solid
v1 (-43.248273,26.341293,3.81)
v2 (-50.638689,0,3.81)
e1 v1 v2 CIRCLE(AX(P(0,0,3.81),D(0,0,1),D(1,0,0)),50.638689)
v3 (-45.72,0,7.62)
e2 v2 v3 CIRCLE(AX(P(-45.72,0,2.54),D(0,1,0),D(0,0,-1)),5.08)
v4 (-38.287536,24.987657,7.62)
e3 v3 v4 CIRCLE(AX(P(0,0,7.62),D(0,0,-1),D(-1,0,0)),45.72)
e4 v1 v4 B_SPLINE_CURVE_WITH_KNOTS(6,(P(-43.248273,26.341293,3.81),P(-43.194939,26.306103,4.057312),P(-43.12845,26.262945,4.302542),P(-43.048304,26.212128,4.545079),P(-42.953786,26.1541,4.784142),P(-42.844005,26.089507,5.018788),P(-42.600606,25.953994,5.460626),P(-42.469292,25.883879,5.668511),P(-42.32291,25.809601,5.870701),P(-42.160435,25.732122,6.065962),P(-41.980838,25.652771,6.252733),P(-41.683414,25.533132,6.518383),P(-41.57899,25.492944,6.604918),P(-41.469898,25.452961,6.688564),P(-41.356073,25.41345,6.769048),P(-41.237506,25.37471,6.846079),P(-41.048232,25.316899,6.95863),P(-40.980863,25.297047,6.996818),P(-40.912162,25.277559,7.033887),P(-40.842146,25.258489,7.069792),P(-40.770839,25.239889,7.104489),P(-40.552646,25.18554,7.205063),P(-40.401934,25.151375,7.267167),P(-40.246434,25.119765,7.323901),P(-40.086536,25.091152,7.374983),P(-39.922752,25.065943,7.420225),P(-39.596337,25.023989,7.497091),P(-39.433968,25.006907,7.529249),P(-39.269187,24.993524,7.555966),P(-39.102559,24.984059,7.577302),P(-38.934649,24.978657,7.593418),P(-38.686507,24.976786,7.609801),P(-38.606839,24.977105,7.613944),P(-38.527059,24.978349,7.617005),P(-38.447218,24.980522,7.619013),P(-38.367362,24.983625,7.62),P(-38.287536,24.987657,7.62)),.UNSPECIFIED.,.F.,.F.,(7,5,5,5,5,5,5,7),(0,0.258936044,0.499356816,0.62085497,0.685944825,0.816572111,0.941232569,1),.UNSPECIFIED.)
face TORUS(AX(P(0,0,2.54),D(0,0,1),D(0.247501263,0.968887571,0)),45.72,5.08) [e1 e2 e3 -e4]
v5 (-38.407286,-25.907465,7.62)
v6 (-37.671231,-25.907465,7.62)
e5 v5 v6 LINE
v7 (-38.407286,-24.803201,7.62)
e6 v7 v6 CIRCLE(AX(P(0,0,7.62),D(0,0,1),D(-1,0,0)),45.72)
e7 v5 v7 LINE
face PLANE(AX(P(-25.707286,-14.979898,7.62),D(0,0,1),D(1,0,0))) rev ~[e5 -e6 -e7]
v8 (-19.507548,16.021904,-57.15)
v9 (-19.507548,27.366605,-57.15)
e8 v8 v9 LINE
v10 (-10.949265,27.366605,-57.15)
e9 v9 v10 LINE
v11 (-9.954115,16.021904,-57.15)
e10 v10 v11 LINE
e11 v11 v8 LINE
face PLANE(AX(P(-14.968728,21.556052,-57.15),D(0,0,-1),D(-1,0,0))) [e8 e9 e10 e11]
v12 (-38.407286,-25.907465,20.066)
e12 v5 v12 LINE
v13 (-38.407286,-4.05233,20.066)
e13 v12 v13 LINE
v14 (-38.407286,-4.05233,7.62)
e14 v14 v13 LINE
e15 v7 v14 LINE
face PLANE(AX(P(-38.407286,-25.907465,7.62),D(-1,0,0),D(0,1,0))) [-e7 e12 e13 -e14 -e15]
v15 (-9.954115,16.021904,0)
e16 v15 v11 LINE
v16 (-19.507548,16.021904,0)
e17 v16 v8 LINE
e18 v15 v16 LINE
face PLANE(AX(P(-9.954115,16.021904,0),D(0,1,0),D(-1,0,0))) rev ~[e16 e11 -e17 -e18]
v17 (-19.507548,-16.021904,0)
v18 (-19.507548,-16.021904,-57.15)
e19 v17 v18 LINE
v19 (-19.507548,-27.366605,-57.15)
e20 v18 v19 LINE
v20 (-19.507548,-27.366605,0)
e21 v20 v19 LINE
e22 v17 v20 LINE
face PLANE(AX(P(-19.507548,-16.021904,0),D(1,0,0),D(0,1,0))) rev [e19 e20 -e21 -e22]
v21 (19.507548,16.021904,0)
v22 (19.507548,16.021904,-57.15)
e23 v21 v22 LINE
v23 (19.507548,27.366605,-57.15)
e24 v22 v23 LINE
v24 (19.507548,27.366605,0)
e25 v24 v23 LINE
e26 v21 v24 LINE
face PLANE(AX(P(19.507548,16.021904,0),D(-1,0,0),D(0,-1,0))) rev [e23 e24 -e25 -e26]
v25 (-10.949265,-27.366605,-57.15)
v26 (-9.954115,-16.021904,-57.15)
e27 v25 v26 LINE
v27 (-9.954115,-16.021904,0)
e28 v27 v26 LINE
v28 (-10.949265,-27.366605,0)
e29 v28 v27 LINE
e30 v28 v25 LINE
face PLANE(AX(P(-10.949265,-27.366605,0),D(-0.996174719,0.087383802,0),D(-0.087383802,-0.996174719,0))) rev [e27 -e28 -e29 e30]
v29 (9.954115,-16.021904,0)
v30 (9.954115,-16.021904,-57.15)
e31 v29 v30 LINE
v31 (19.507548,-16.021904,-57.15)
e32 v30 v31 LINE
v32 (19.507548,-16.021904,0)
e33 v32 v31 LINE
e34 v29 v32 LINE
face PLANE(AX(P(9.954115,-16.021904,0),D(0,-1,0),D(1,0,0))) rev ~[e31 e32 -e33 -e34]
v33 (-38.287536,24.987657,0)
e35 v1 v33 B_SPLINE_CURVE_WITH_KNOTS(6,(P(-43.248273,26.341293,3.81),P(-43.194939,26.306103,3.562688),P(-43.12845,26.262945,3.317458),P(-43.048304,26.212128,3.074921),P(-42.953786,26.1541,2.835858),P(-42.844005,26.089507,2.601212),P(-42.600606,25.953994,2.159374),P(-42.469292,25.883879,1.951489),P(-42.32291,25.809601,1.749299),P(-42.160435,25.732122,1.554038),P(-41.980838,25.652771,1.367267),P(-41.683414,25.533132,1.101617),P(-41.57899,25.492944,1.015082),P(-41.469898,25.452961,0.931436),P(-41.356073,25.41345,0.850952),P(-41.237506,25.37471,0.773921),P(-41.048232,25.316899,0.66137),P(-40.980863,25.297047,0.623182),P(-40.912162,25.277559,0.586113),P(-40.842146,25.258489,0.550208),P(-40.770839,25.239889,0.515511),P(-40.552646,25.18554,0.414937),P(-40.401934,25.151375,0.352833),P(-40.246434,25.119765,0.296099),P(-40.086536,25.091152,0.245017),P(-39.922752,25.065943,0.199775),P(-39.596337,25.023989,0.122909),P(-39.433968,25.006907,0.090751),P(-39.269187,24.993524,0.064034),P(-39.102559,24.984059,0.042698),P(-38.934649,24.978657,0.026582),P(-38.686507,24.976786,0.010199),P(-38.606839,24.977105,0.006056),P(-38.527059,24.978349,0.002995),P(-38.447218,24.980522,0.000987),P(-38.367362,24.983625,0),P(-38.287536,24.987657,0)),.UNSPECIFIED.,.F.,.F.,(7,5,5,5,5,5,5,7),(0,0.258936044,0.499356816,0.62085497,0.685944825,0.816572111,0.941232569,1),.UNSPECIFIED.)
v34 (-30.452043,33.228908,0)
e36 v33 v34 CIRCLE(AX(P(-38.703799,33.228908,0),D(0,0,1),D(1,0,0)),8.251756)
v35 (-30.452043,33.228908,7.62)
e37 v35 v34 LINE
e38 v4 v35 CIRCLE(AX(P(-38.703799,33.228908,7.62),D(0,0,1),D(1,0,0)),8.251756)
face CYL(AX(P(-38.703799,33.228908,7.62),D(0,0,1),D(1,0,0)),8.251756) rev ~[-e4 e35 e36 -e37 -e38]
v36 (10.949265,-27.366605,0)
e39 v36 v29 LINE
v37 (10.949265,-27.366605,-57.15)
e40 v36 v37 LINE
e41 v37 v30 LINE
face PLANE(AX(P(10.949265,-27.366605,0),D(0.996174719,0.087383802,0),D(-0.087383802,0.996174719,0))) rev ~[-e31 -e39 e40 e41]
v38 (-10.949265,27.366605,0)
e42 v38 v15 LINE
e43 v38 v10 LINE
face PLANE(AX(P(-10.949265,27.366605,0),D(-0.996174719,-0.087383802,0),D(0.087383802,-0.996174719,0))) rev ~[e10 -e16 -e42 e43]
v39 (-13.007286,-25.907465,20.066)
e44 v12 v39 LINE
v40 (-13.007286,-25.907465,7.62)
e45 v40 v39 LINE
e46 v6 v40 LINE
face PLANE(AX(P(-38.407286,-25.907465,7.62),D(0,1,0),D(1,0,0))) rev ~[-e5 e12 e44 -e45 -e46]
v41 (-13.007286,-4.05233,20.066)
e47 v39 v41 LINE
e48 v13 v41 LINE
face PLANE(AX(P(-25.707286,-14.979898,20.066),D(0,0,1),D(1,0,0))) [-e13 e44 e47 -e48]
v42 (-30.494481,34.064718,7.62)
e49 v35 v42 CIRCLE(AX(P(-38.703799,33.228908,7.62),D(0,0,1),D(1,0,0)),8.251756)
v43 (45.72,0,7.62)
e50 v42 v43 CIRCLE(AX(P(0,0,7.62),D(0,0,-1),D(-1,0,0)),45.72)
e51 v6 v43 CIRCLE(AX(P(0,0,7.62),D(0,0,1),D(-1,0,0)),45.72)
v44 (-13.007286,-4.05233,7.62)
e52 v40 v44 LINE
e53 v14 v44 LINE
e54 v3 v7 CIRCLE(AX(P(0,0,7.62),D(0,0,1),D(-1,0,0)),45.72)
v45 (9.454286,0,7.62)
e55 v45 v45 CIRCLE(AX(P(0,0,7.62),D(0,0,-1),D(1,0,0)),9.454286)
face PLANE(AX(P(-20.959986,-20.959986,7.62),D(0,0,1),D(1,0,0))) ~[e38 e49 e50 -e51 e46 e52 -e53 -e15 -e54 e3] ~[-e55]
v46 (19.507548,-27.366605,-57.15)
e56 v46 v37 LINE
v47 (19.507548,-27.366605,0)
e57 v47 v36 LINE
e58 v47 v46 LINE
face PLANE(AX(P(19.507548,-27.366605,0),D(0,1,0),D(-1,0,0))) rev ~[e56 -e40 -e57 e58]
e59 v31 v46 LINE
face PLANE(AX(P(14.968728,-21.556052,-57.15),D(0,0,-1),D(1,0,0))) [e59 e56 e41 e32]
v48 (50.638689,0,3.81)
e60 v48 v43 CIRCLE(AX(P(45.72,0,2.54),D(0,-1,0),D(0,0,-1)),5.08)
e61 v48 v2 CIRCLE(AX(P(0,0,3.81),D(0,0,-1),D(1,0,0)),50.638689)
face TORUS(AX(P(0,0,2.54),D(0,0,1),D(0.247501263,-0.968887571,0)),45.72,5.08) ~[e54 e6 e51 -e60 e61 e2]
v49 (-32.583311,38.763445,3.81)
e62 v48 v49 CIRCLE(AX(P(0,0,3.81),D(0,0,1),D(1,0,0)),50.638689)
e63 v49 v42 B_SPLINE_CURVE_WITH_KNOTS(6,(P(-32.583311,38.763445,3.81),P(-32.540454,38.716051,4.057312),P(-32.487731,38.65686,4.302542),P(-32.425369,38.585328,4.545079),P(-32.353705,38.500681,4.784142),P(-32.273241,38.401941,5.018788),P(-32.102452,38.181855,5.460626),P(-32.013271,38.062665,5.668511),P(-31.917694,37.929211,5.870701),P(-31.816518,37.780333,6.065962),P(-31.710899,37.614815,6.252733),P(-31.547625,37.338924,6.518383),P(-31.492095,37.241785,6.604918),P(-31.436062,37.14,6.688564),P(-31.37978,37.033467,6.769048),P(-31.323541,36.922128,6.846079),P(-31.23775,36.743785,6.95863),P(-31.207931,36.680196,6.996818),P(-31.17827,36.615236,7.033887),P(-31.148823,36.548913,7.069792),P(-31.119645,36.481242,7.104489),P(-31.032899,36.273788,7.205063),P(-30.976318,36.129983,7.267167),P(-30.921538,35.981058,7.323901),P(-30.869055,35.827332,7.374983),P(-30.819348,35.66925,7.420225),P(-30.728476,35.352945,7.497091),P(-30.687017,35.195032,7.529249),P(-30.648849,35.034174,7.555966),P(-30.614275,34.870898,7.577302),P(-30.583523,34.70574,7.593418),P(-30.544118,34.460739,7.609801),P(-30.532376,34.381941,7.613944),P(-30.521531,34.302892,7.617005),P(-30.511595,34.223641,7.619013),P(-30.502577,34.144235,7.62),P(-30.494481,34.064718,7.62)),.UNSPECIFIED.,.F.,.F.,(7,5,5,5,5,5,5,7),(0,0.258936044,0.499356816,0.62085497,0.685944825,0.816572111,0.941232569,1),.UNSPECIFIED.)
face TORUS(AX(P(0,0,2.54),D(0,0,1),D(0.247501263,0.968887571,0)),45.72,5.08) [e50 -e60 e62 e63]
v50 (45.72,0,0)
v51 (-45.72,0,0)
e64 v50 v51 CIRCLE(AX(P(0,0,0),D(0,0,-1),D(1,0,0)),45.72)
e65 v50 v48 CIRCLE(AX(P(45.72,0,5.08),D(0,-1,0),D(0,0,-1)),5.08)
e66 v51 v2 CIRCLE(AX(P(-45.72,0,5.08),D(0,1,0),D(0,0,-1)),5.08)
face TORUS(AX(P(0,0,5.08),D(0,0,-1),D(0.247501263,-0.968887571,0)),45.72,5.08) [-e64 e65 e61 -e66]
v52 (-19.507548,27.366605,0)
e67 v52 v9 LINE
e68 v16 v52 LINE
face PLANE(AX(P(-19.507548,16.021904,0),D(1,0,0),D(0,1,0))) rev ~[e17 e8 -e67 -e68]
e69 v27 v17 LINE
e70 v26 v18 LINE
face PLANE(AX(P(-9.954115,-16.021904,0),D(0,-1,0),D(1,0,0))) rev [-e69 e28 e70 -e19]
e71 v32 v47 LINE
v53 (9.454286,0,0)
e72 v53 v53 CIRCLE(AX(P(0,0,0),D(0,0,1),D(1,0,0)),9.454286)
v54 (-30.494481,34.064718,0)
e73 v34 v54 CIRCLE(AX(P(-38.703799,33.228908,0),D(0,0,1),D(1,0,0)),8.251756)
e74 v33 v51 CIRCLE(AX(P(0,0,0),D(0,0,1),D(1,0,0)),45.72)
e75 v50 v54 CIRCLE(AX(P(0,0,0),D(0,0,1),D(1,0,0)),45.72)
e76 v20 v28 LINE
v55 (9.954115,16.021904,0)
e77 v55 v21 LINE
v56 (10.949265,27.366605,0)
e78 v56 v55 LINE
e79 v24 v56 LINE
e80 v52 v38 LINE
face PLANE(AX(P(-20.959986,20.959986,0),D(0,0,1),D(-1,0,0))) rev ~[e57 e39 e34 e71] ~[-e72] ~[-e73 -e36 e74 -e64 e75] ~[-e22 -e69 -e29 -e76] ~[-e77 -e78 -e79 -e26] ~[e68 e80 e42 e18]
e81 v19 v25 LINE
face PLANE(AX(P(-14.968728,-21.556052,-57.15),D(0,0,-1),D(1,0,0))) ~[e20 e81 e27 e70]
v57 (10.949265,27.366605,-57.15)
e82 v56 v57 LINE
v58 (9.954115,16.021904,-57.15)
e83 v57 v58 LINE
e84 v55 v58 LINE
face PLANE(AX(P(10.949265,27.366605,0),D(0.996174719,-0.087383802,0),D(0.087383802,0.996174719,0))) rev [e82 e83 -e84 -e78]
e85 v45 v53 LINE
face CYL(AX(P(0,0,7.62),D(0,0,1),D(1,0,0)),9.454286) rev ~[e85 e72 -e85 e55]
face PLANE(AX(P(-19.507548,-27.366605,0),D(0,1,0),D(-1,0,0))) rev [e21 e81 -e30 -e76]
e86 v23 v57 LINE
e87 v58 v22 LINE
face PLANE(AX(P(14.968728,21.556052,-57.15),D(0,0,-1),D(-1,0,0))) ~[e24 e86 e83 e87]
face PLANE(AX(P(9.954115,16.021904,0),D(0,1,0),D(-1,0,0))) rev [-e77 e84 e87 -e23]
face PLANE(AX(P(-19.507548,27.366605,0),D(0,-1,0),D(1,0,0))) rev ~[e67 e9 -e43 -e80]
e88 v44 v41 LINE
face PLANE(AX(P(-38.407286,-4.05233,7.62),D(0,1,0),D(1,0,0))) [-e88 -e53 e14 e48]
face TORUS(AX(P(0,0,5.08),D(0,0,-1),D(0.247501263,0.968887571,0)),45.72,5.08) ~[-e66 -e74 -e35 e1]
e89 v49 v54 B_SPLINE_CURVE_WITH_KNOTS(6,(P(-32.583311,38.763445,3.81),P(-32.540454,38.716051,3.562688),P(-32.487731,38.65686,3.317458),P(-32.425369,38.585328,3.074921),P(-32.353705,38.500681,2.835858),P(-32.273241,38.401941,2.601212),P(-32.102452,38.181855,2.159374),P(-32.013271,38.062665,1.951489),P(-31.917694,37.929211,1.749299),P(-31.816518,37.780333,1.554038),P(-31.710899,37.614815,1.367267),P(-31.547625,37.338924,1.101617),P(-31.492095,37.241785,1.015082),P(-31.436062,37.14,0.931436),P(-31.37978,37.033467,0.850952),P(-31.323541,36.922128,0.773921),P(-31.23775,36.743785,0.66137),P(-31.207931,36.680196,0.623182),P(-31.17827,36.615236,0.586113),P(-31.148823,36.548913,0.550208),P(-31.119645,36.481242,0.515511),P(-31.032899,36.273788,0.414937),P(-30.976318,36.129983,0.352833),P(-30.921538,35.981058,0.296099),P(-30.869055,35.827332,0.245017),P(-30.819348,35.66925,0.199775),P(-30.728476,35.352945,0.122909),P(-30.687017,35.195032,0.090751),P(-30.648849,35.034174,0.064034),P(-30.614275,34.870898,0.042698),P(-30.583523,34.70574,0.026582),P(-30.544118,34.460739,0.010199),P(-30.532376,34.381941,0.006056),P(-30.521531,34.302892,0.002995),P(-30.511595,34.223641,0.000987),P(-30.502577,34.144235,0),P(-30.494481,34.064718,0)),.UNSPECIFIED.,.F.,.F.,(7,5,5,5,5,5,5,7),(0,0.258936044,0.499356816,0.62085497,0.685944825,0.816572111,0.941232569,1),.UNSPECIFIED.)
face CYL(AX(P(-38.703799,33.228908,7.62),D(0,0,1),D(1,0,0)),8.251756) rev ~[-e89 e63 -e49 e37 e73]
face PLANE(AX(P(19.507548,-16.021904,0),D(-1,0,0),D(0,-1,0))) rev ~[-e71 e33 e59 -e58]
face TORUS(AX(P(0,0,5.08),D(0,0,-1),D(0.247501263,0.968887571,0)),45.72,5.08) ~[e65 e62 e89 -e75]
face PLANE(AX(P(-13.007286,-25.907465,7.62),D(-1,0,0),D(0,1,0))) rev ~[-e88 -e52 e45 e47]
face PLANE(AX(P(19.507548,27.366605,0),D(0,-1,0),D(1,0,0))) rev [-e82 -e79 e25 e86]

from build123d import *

# Parameters (mm, degrees)
F1_DEPTH    = 7.62
F3_DEPTH    = 57.15
F4_T2_ANGLE = 118.6593978475
F4_T4_ANGLE = 118.6593978475
F7_R        = 8.2517563721
F8_DEPTH    = 25.4
F9_R        = 9.4542856314
F10_DEPTH   = 26.162
F11_W       = 25.4
F11_H       = 21.8551358064
F12_DEPTH   = 12.446


# Not quite as in the source:
# - a fillet or chamfer that OpenCascade refuses, or shapes differently, is made with other operations: its cross-section is extruded or revolved along the edge and cut away or added


with BuildPart() as f1:
    # F0 (on Top) → F1 (new body)
    with BuildSketch(Plane.XY):
        with BuildLine():
            ThreePointArc((0, -50.8), (35.9210244843, -35.9210244843), (50.8, 0))
            Line((50.8, 0), (0, 0))
            Line((0, 0), (0, -50.8))
        make_face()
    extrude(amount=F1_DEPTH)

    # F2 (on face) → F3 (join)
    with BuildSketch(Plane(origin=(0, 0, 0), x_dir=(1, 0, 0), z_dir=(0, 0, -1))):
        Polygon((19.5075478405, 27.366604656), (10.9492652118, 27.366604656), (9.9541153759, 16.0219036043), (19.5075478405, 16.0219036043), align=None)
    extrude(amount=F3_DEPTH)

    # F4: fillet of radius 5.08 on 2 edges, made by hand

    # F4_s1 → F4_t2 (revolve, cut)
    with BuildSketch(Plane(origin=(0, 0, 0), x_dir=(0, 0, 1), z_dir=(-0.9688875708, 0.247501263, 0))):
        with BuildLine():
            ThreePointArc((2.54, -50.8), (6.1321024484, -49.3121024484), (7.62, -45.72))
            Line((7.62, -45.72), (7.62, -50.8))
            Line((7.62, -50.8), (2.54, -50.8))
        make_face()
    revolve(axis=Axis((0, 0, 7.62), (0, 0, 1)), revolution_arc=F4_T2_ANGLE, mode=Mode.SUBTRACT)

    # F4_s3 → F4_t4 (revolve, cut)
    with BuildSketch(Plane(origin=(0, 0, 0), x_dir=(0, 0, 1), z_dir=(-0.9688875708, 0.247501263, 0))):
        with BuildLine():
            ThreePointArc((5.08, -50.8), (1.4878975516, -49.3121024484), (0, -45.72))
            Line((0, -45.72), (0, -50.8))
            Line((0, -50.8), (5.08, -50.8))
        make_face()
    revolve(axis=Axis((0, 0, 0), (0, 0, 1)), revolution_arc=F4_T4_ANGLE, mode=Mode.SUBTRACT)

    # F5: F1 across plane


with BuildPart() as f1_1:
    add(f1.part)
    add(f1.part.mirror(Plane.YZ))

    # F6: F1 across plane


with BuildPart() as f1_2:
    add(f1_1.part)
    add(f1_1.part.mirror(Plane.XZ))

    # F7 (on face) → F8 (cut)
    with BuildSketch(Plane.XY.offset(7.62)):
        with Locations((-38.7037992477, 33.2289077342)):
            Circle(F7_R)
    extrude(amount=-F8_DEPTH, mode=Mode.SUBTRACT)

    # F9 (on face) → F10 (cut)
    with BuildSketch(Plane.XY.offset(7.62)):
        Circle(F9_R)
    extrude(amount=-F10_DEPTH, mode=Mode.SUBTRACT)

    # F11 (on face) → F12 (join)
    with BuildSketch(Plane.XY.offset(7.62)):
        with Locations((-25.7072858512, -14.9798975326)):
            Rectangle(F11_W, F11_H)
    extrude(amount=F12_DEPTH)


solid = f1_2.part
